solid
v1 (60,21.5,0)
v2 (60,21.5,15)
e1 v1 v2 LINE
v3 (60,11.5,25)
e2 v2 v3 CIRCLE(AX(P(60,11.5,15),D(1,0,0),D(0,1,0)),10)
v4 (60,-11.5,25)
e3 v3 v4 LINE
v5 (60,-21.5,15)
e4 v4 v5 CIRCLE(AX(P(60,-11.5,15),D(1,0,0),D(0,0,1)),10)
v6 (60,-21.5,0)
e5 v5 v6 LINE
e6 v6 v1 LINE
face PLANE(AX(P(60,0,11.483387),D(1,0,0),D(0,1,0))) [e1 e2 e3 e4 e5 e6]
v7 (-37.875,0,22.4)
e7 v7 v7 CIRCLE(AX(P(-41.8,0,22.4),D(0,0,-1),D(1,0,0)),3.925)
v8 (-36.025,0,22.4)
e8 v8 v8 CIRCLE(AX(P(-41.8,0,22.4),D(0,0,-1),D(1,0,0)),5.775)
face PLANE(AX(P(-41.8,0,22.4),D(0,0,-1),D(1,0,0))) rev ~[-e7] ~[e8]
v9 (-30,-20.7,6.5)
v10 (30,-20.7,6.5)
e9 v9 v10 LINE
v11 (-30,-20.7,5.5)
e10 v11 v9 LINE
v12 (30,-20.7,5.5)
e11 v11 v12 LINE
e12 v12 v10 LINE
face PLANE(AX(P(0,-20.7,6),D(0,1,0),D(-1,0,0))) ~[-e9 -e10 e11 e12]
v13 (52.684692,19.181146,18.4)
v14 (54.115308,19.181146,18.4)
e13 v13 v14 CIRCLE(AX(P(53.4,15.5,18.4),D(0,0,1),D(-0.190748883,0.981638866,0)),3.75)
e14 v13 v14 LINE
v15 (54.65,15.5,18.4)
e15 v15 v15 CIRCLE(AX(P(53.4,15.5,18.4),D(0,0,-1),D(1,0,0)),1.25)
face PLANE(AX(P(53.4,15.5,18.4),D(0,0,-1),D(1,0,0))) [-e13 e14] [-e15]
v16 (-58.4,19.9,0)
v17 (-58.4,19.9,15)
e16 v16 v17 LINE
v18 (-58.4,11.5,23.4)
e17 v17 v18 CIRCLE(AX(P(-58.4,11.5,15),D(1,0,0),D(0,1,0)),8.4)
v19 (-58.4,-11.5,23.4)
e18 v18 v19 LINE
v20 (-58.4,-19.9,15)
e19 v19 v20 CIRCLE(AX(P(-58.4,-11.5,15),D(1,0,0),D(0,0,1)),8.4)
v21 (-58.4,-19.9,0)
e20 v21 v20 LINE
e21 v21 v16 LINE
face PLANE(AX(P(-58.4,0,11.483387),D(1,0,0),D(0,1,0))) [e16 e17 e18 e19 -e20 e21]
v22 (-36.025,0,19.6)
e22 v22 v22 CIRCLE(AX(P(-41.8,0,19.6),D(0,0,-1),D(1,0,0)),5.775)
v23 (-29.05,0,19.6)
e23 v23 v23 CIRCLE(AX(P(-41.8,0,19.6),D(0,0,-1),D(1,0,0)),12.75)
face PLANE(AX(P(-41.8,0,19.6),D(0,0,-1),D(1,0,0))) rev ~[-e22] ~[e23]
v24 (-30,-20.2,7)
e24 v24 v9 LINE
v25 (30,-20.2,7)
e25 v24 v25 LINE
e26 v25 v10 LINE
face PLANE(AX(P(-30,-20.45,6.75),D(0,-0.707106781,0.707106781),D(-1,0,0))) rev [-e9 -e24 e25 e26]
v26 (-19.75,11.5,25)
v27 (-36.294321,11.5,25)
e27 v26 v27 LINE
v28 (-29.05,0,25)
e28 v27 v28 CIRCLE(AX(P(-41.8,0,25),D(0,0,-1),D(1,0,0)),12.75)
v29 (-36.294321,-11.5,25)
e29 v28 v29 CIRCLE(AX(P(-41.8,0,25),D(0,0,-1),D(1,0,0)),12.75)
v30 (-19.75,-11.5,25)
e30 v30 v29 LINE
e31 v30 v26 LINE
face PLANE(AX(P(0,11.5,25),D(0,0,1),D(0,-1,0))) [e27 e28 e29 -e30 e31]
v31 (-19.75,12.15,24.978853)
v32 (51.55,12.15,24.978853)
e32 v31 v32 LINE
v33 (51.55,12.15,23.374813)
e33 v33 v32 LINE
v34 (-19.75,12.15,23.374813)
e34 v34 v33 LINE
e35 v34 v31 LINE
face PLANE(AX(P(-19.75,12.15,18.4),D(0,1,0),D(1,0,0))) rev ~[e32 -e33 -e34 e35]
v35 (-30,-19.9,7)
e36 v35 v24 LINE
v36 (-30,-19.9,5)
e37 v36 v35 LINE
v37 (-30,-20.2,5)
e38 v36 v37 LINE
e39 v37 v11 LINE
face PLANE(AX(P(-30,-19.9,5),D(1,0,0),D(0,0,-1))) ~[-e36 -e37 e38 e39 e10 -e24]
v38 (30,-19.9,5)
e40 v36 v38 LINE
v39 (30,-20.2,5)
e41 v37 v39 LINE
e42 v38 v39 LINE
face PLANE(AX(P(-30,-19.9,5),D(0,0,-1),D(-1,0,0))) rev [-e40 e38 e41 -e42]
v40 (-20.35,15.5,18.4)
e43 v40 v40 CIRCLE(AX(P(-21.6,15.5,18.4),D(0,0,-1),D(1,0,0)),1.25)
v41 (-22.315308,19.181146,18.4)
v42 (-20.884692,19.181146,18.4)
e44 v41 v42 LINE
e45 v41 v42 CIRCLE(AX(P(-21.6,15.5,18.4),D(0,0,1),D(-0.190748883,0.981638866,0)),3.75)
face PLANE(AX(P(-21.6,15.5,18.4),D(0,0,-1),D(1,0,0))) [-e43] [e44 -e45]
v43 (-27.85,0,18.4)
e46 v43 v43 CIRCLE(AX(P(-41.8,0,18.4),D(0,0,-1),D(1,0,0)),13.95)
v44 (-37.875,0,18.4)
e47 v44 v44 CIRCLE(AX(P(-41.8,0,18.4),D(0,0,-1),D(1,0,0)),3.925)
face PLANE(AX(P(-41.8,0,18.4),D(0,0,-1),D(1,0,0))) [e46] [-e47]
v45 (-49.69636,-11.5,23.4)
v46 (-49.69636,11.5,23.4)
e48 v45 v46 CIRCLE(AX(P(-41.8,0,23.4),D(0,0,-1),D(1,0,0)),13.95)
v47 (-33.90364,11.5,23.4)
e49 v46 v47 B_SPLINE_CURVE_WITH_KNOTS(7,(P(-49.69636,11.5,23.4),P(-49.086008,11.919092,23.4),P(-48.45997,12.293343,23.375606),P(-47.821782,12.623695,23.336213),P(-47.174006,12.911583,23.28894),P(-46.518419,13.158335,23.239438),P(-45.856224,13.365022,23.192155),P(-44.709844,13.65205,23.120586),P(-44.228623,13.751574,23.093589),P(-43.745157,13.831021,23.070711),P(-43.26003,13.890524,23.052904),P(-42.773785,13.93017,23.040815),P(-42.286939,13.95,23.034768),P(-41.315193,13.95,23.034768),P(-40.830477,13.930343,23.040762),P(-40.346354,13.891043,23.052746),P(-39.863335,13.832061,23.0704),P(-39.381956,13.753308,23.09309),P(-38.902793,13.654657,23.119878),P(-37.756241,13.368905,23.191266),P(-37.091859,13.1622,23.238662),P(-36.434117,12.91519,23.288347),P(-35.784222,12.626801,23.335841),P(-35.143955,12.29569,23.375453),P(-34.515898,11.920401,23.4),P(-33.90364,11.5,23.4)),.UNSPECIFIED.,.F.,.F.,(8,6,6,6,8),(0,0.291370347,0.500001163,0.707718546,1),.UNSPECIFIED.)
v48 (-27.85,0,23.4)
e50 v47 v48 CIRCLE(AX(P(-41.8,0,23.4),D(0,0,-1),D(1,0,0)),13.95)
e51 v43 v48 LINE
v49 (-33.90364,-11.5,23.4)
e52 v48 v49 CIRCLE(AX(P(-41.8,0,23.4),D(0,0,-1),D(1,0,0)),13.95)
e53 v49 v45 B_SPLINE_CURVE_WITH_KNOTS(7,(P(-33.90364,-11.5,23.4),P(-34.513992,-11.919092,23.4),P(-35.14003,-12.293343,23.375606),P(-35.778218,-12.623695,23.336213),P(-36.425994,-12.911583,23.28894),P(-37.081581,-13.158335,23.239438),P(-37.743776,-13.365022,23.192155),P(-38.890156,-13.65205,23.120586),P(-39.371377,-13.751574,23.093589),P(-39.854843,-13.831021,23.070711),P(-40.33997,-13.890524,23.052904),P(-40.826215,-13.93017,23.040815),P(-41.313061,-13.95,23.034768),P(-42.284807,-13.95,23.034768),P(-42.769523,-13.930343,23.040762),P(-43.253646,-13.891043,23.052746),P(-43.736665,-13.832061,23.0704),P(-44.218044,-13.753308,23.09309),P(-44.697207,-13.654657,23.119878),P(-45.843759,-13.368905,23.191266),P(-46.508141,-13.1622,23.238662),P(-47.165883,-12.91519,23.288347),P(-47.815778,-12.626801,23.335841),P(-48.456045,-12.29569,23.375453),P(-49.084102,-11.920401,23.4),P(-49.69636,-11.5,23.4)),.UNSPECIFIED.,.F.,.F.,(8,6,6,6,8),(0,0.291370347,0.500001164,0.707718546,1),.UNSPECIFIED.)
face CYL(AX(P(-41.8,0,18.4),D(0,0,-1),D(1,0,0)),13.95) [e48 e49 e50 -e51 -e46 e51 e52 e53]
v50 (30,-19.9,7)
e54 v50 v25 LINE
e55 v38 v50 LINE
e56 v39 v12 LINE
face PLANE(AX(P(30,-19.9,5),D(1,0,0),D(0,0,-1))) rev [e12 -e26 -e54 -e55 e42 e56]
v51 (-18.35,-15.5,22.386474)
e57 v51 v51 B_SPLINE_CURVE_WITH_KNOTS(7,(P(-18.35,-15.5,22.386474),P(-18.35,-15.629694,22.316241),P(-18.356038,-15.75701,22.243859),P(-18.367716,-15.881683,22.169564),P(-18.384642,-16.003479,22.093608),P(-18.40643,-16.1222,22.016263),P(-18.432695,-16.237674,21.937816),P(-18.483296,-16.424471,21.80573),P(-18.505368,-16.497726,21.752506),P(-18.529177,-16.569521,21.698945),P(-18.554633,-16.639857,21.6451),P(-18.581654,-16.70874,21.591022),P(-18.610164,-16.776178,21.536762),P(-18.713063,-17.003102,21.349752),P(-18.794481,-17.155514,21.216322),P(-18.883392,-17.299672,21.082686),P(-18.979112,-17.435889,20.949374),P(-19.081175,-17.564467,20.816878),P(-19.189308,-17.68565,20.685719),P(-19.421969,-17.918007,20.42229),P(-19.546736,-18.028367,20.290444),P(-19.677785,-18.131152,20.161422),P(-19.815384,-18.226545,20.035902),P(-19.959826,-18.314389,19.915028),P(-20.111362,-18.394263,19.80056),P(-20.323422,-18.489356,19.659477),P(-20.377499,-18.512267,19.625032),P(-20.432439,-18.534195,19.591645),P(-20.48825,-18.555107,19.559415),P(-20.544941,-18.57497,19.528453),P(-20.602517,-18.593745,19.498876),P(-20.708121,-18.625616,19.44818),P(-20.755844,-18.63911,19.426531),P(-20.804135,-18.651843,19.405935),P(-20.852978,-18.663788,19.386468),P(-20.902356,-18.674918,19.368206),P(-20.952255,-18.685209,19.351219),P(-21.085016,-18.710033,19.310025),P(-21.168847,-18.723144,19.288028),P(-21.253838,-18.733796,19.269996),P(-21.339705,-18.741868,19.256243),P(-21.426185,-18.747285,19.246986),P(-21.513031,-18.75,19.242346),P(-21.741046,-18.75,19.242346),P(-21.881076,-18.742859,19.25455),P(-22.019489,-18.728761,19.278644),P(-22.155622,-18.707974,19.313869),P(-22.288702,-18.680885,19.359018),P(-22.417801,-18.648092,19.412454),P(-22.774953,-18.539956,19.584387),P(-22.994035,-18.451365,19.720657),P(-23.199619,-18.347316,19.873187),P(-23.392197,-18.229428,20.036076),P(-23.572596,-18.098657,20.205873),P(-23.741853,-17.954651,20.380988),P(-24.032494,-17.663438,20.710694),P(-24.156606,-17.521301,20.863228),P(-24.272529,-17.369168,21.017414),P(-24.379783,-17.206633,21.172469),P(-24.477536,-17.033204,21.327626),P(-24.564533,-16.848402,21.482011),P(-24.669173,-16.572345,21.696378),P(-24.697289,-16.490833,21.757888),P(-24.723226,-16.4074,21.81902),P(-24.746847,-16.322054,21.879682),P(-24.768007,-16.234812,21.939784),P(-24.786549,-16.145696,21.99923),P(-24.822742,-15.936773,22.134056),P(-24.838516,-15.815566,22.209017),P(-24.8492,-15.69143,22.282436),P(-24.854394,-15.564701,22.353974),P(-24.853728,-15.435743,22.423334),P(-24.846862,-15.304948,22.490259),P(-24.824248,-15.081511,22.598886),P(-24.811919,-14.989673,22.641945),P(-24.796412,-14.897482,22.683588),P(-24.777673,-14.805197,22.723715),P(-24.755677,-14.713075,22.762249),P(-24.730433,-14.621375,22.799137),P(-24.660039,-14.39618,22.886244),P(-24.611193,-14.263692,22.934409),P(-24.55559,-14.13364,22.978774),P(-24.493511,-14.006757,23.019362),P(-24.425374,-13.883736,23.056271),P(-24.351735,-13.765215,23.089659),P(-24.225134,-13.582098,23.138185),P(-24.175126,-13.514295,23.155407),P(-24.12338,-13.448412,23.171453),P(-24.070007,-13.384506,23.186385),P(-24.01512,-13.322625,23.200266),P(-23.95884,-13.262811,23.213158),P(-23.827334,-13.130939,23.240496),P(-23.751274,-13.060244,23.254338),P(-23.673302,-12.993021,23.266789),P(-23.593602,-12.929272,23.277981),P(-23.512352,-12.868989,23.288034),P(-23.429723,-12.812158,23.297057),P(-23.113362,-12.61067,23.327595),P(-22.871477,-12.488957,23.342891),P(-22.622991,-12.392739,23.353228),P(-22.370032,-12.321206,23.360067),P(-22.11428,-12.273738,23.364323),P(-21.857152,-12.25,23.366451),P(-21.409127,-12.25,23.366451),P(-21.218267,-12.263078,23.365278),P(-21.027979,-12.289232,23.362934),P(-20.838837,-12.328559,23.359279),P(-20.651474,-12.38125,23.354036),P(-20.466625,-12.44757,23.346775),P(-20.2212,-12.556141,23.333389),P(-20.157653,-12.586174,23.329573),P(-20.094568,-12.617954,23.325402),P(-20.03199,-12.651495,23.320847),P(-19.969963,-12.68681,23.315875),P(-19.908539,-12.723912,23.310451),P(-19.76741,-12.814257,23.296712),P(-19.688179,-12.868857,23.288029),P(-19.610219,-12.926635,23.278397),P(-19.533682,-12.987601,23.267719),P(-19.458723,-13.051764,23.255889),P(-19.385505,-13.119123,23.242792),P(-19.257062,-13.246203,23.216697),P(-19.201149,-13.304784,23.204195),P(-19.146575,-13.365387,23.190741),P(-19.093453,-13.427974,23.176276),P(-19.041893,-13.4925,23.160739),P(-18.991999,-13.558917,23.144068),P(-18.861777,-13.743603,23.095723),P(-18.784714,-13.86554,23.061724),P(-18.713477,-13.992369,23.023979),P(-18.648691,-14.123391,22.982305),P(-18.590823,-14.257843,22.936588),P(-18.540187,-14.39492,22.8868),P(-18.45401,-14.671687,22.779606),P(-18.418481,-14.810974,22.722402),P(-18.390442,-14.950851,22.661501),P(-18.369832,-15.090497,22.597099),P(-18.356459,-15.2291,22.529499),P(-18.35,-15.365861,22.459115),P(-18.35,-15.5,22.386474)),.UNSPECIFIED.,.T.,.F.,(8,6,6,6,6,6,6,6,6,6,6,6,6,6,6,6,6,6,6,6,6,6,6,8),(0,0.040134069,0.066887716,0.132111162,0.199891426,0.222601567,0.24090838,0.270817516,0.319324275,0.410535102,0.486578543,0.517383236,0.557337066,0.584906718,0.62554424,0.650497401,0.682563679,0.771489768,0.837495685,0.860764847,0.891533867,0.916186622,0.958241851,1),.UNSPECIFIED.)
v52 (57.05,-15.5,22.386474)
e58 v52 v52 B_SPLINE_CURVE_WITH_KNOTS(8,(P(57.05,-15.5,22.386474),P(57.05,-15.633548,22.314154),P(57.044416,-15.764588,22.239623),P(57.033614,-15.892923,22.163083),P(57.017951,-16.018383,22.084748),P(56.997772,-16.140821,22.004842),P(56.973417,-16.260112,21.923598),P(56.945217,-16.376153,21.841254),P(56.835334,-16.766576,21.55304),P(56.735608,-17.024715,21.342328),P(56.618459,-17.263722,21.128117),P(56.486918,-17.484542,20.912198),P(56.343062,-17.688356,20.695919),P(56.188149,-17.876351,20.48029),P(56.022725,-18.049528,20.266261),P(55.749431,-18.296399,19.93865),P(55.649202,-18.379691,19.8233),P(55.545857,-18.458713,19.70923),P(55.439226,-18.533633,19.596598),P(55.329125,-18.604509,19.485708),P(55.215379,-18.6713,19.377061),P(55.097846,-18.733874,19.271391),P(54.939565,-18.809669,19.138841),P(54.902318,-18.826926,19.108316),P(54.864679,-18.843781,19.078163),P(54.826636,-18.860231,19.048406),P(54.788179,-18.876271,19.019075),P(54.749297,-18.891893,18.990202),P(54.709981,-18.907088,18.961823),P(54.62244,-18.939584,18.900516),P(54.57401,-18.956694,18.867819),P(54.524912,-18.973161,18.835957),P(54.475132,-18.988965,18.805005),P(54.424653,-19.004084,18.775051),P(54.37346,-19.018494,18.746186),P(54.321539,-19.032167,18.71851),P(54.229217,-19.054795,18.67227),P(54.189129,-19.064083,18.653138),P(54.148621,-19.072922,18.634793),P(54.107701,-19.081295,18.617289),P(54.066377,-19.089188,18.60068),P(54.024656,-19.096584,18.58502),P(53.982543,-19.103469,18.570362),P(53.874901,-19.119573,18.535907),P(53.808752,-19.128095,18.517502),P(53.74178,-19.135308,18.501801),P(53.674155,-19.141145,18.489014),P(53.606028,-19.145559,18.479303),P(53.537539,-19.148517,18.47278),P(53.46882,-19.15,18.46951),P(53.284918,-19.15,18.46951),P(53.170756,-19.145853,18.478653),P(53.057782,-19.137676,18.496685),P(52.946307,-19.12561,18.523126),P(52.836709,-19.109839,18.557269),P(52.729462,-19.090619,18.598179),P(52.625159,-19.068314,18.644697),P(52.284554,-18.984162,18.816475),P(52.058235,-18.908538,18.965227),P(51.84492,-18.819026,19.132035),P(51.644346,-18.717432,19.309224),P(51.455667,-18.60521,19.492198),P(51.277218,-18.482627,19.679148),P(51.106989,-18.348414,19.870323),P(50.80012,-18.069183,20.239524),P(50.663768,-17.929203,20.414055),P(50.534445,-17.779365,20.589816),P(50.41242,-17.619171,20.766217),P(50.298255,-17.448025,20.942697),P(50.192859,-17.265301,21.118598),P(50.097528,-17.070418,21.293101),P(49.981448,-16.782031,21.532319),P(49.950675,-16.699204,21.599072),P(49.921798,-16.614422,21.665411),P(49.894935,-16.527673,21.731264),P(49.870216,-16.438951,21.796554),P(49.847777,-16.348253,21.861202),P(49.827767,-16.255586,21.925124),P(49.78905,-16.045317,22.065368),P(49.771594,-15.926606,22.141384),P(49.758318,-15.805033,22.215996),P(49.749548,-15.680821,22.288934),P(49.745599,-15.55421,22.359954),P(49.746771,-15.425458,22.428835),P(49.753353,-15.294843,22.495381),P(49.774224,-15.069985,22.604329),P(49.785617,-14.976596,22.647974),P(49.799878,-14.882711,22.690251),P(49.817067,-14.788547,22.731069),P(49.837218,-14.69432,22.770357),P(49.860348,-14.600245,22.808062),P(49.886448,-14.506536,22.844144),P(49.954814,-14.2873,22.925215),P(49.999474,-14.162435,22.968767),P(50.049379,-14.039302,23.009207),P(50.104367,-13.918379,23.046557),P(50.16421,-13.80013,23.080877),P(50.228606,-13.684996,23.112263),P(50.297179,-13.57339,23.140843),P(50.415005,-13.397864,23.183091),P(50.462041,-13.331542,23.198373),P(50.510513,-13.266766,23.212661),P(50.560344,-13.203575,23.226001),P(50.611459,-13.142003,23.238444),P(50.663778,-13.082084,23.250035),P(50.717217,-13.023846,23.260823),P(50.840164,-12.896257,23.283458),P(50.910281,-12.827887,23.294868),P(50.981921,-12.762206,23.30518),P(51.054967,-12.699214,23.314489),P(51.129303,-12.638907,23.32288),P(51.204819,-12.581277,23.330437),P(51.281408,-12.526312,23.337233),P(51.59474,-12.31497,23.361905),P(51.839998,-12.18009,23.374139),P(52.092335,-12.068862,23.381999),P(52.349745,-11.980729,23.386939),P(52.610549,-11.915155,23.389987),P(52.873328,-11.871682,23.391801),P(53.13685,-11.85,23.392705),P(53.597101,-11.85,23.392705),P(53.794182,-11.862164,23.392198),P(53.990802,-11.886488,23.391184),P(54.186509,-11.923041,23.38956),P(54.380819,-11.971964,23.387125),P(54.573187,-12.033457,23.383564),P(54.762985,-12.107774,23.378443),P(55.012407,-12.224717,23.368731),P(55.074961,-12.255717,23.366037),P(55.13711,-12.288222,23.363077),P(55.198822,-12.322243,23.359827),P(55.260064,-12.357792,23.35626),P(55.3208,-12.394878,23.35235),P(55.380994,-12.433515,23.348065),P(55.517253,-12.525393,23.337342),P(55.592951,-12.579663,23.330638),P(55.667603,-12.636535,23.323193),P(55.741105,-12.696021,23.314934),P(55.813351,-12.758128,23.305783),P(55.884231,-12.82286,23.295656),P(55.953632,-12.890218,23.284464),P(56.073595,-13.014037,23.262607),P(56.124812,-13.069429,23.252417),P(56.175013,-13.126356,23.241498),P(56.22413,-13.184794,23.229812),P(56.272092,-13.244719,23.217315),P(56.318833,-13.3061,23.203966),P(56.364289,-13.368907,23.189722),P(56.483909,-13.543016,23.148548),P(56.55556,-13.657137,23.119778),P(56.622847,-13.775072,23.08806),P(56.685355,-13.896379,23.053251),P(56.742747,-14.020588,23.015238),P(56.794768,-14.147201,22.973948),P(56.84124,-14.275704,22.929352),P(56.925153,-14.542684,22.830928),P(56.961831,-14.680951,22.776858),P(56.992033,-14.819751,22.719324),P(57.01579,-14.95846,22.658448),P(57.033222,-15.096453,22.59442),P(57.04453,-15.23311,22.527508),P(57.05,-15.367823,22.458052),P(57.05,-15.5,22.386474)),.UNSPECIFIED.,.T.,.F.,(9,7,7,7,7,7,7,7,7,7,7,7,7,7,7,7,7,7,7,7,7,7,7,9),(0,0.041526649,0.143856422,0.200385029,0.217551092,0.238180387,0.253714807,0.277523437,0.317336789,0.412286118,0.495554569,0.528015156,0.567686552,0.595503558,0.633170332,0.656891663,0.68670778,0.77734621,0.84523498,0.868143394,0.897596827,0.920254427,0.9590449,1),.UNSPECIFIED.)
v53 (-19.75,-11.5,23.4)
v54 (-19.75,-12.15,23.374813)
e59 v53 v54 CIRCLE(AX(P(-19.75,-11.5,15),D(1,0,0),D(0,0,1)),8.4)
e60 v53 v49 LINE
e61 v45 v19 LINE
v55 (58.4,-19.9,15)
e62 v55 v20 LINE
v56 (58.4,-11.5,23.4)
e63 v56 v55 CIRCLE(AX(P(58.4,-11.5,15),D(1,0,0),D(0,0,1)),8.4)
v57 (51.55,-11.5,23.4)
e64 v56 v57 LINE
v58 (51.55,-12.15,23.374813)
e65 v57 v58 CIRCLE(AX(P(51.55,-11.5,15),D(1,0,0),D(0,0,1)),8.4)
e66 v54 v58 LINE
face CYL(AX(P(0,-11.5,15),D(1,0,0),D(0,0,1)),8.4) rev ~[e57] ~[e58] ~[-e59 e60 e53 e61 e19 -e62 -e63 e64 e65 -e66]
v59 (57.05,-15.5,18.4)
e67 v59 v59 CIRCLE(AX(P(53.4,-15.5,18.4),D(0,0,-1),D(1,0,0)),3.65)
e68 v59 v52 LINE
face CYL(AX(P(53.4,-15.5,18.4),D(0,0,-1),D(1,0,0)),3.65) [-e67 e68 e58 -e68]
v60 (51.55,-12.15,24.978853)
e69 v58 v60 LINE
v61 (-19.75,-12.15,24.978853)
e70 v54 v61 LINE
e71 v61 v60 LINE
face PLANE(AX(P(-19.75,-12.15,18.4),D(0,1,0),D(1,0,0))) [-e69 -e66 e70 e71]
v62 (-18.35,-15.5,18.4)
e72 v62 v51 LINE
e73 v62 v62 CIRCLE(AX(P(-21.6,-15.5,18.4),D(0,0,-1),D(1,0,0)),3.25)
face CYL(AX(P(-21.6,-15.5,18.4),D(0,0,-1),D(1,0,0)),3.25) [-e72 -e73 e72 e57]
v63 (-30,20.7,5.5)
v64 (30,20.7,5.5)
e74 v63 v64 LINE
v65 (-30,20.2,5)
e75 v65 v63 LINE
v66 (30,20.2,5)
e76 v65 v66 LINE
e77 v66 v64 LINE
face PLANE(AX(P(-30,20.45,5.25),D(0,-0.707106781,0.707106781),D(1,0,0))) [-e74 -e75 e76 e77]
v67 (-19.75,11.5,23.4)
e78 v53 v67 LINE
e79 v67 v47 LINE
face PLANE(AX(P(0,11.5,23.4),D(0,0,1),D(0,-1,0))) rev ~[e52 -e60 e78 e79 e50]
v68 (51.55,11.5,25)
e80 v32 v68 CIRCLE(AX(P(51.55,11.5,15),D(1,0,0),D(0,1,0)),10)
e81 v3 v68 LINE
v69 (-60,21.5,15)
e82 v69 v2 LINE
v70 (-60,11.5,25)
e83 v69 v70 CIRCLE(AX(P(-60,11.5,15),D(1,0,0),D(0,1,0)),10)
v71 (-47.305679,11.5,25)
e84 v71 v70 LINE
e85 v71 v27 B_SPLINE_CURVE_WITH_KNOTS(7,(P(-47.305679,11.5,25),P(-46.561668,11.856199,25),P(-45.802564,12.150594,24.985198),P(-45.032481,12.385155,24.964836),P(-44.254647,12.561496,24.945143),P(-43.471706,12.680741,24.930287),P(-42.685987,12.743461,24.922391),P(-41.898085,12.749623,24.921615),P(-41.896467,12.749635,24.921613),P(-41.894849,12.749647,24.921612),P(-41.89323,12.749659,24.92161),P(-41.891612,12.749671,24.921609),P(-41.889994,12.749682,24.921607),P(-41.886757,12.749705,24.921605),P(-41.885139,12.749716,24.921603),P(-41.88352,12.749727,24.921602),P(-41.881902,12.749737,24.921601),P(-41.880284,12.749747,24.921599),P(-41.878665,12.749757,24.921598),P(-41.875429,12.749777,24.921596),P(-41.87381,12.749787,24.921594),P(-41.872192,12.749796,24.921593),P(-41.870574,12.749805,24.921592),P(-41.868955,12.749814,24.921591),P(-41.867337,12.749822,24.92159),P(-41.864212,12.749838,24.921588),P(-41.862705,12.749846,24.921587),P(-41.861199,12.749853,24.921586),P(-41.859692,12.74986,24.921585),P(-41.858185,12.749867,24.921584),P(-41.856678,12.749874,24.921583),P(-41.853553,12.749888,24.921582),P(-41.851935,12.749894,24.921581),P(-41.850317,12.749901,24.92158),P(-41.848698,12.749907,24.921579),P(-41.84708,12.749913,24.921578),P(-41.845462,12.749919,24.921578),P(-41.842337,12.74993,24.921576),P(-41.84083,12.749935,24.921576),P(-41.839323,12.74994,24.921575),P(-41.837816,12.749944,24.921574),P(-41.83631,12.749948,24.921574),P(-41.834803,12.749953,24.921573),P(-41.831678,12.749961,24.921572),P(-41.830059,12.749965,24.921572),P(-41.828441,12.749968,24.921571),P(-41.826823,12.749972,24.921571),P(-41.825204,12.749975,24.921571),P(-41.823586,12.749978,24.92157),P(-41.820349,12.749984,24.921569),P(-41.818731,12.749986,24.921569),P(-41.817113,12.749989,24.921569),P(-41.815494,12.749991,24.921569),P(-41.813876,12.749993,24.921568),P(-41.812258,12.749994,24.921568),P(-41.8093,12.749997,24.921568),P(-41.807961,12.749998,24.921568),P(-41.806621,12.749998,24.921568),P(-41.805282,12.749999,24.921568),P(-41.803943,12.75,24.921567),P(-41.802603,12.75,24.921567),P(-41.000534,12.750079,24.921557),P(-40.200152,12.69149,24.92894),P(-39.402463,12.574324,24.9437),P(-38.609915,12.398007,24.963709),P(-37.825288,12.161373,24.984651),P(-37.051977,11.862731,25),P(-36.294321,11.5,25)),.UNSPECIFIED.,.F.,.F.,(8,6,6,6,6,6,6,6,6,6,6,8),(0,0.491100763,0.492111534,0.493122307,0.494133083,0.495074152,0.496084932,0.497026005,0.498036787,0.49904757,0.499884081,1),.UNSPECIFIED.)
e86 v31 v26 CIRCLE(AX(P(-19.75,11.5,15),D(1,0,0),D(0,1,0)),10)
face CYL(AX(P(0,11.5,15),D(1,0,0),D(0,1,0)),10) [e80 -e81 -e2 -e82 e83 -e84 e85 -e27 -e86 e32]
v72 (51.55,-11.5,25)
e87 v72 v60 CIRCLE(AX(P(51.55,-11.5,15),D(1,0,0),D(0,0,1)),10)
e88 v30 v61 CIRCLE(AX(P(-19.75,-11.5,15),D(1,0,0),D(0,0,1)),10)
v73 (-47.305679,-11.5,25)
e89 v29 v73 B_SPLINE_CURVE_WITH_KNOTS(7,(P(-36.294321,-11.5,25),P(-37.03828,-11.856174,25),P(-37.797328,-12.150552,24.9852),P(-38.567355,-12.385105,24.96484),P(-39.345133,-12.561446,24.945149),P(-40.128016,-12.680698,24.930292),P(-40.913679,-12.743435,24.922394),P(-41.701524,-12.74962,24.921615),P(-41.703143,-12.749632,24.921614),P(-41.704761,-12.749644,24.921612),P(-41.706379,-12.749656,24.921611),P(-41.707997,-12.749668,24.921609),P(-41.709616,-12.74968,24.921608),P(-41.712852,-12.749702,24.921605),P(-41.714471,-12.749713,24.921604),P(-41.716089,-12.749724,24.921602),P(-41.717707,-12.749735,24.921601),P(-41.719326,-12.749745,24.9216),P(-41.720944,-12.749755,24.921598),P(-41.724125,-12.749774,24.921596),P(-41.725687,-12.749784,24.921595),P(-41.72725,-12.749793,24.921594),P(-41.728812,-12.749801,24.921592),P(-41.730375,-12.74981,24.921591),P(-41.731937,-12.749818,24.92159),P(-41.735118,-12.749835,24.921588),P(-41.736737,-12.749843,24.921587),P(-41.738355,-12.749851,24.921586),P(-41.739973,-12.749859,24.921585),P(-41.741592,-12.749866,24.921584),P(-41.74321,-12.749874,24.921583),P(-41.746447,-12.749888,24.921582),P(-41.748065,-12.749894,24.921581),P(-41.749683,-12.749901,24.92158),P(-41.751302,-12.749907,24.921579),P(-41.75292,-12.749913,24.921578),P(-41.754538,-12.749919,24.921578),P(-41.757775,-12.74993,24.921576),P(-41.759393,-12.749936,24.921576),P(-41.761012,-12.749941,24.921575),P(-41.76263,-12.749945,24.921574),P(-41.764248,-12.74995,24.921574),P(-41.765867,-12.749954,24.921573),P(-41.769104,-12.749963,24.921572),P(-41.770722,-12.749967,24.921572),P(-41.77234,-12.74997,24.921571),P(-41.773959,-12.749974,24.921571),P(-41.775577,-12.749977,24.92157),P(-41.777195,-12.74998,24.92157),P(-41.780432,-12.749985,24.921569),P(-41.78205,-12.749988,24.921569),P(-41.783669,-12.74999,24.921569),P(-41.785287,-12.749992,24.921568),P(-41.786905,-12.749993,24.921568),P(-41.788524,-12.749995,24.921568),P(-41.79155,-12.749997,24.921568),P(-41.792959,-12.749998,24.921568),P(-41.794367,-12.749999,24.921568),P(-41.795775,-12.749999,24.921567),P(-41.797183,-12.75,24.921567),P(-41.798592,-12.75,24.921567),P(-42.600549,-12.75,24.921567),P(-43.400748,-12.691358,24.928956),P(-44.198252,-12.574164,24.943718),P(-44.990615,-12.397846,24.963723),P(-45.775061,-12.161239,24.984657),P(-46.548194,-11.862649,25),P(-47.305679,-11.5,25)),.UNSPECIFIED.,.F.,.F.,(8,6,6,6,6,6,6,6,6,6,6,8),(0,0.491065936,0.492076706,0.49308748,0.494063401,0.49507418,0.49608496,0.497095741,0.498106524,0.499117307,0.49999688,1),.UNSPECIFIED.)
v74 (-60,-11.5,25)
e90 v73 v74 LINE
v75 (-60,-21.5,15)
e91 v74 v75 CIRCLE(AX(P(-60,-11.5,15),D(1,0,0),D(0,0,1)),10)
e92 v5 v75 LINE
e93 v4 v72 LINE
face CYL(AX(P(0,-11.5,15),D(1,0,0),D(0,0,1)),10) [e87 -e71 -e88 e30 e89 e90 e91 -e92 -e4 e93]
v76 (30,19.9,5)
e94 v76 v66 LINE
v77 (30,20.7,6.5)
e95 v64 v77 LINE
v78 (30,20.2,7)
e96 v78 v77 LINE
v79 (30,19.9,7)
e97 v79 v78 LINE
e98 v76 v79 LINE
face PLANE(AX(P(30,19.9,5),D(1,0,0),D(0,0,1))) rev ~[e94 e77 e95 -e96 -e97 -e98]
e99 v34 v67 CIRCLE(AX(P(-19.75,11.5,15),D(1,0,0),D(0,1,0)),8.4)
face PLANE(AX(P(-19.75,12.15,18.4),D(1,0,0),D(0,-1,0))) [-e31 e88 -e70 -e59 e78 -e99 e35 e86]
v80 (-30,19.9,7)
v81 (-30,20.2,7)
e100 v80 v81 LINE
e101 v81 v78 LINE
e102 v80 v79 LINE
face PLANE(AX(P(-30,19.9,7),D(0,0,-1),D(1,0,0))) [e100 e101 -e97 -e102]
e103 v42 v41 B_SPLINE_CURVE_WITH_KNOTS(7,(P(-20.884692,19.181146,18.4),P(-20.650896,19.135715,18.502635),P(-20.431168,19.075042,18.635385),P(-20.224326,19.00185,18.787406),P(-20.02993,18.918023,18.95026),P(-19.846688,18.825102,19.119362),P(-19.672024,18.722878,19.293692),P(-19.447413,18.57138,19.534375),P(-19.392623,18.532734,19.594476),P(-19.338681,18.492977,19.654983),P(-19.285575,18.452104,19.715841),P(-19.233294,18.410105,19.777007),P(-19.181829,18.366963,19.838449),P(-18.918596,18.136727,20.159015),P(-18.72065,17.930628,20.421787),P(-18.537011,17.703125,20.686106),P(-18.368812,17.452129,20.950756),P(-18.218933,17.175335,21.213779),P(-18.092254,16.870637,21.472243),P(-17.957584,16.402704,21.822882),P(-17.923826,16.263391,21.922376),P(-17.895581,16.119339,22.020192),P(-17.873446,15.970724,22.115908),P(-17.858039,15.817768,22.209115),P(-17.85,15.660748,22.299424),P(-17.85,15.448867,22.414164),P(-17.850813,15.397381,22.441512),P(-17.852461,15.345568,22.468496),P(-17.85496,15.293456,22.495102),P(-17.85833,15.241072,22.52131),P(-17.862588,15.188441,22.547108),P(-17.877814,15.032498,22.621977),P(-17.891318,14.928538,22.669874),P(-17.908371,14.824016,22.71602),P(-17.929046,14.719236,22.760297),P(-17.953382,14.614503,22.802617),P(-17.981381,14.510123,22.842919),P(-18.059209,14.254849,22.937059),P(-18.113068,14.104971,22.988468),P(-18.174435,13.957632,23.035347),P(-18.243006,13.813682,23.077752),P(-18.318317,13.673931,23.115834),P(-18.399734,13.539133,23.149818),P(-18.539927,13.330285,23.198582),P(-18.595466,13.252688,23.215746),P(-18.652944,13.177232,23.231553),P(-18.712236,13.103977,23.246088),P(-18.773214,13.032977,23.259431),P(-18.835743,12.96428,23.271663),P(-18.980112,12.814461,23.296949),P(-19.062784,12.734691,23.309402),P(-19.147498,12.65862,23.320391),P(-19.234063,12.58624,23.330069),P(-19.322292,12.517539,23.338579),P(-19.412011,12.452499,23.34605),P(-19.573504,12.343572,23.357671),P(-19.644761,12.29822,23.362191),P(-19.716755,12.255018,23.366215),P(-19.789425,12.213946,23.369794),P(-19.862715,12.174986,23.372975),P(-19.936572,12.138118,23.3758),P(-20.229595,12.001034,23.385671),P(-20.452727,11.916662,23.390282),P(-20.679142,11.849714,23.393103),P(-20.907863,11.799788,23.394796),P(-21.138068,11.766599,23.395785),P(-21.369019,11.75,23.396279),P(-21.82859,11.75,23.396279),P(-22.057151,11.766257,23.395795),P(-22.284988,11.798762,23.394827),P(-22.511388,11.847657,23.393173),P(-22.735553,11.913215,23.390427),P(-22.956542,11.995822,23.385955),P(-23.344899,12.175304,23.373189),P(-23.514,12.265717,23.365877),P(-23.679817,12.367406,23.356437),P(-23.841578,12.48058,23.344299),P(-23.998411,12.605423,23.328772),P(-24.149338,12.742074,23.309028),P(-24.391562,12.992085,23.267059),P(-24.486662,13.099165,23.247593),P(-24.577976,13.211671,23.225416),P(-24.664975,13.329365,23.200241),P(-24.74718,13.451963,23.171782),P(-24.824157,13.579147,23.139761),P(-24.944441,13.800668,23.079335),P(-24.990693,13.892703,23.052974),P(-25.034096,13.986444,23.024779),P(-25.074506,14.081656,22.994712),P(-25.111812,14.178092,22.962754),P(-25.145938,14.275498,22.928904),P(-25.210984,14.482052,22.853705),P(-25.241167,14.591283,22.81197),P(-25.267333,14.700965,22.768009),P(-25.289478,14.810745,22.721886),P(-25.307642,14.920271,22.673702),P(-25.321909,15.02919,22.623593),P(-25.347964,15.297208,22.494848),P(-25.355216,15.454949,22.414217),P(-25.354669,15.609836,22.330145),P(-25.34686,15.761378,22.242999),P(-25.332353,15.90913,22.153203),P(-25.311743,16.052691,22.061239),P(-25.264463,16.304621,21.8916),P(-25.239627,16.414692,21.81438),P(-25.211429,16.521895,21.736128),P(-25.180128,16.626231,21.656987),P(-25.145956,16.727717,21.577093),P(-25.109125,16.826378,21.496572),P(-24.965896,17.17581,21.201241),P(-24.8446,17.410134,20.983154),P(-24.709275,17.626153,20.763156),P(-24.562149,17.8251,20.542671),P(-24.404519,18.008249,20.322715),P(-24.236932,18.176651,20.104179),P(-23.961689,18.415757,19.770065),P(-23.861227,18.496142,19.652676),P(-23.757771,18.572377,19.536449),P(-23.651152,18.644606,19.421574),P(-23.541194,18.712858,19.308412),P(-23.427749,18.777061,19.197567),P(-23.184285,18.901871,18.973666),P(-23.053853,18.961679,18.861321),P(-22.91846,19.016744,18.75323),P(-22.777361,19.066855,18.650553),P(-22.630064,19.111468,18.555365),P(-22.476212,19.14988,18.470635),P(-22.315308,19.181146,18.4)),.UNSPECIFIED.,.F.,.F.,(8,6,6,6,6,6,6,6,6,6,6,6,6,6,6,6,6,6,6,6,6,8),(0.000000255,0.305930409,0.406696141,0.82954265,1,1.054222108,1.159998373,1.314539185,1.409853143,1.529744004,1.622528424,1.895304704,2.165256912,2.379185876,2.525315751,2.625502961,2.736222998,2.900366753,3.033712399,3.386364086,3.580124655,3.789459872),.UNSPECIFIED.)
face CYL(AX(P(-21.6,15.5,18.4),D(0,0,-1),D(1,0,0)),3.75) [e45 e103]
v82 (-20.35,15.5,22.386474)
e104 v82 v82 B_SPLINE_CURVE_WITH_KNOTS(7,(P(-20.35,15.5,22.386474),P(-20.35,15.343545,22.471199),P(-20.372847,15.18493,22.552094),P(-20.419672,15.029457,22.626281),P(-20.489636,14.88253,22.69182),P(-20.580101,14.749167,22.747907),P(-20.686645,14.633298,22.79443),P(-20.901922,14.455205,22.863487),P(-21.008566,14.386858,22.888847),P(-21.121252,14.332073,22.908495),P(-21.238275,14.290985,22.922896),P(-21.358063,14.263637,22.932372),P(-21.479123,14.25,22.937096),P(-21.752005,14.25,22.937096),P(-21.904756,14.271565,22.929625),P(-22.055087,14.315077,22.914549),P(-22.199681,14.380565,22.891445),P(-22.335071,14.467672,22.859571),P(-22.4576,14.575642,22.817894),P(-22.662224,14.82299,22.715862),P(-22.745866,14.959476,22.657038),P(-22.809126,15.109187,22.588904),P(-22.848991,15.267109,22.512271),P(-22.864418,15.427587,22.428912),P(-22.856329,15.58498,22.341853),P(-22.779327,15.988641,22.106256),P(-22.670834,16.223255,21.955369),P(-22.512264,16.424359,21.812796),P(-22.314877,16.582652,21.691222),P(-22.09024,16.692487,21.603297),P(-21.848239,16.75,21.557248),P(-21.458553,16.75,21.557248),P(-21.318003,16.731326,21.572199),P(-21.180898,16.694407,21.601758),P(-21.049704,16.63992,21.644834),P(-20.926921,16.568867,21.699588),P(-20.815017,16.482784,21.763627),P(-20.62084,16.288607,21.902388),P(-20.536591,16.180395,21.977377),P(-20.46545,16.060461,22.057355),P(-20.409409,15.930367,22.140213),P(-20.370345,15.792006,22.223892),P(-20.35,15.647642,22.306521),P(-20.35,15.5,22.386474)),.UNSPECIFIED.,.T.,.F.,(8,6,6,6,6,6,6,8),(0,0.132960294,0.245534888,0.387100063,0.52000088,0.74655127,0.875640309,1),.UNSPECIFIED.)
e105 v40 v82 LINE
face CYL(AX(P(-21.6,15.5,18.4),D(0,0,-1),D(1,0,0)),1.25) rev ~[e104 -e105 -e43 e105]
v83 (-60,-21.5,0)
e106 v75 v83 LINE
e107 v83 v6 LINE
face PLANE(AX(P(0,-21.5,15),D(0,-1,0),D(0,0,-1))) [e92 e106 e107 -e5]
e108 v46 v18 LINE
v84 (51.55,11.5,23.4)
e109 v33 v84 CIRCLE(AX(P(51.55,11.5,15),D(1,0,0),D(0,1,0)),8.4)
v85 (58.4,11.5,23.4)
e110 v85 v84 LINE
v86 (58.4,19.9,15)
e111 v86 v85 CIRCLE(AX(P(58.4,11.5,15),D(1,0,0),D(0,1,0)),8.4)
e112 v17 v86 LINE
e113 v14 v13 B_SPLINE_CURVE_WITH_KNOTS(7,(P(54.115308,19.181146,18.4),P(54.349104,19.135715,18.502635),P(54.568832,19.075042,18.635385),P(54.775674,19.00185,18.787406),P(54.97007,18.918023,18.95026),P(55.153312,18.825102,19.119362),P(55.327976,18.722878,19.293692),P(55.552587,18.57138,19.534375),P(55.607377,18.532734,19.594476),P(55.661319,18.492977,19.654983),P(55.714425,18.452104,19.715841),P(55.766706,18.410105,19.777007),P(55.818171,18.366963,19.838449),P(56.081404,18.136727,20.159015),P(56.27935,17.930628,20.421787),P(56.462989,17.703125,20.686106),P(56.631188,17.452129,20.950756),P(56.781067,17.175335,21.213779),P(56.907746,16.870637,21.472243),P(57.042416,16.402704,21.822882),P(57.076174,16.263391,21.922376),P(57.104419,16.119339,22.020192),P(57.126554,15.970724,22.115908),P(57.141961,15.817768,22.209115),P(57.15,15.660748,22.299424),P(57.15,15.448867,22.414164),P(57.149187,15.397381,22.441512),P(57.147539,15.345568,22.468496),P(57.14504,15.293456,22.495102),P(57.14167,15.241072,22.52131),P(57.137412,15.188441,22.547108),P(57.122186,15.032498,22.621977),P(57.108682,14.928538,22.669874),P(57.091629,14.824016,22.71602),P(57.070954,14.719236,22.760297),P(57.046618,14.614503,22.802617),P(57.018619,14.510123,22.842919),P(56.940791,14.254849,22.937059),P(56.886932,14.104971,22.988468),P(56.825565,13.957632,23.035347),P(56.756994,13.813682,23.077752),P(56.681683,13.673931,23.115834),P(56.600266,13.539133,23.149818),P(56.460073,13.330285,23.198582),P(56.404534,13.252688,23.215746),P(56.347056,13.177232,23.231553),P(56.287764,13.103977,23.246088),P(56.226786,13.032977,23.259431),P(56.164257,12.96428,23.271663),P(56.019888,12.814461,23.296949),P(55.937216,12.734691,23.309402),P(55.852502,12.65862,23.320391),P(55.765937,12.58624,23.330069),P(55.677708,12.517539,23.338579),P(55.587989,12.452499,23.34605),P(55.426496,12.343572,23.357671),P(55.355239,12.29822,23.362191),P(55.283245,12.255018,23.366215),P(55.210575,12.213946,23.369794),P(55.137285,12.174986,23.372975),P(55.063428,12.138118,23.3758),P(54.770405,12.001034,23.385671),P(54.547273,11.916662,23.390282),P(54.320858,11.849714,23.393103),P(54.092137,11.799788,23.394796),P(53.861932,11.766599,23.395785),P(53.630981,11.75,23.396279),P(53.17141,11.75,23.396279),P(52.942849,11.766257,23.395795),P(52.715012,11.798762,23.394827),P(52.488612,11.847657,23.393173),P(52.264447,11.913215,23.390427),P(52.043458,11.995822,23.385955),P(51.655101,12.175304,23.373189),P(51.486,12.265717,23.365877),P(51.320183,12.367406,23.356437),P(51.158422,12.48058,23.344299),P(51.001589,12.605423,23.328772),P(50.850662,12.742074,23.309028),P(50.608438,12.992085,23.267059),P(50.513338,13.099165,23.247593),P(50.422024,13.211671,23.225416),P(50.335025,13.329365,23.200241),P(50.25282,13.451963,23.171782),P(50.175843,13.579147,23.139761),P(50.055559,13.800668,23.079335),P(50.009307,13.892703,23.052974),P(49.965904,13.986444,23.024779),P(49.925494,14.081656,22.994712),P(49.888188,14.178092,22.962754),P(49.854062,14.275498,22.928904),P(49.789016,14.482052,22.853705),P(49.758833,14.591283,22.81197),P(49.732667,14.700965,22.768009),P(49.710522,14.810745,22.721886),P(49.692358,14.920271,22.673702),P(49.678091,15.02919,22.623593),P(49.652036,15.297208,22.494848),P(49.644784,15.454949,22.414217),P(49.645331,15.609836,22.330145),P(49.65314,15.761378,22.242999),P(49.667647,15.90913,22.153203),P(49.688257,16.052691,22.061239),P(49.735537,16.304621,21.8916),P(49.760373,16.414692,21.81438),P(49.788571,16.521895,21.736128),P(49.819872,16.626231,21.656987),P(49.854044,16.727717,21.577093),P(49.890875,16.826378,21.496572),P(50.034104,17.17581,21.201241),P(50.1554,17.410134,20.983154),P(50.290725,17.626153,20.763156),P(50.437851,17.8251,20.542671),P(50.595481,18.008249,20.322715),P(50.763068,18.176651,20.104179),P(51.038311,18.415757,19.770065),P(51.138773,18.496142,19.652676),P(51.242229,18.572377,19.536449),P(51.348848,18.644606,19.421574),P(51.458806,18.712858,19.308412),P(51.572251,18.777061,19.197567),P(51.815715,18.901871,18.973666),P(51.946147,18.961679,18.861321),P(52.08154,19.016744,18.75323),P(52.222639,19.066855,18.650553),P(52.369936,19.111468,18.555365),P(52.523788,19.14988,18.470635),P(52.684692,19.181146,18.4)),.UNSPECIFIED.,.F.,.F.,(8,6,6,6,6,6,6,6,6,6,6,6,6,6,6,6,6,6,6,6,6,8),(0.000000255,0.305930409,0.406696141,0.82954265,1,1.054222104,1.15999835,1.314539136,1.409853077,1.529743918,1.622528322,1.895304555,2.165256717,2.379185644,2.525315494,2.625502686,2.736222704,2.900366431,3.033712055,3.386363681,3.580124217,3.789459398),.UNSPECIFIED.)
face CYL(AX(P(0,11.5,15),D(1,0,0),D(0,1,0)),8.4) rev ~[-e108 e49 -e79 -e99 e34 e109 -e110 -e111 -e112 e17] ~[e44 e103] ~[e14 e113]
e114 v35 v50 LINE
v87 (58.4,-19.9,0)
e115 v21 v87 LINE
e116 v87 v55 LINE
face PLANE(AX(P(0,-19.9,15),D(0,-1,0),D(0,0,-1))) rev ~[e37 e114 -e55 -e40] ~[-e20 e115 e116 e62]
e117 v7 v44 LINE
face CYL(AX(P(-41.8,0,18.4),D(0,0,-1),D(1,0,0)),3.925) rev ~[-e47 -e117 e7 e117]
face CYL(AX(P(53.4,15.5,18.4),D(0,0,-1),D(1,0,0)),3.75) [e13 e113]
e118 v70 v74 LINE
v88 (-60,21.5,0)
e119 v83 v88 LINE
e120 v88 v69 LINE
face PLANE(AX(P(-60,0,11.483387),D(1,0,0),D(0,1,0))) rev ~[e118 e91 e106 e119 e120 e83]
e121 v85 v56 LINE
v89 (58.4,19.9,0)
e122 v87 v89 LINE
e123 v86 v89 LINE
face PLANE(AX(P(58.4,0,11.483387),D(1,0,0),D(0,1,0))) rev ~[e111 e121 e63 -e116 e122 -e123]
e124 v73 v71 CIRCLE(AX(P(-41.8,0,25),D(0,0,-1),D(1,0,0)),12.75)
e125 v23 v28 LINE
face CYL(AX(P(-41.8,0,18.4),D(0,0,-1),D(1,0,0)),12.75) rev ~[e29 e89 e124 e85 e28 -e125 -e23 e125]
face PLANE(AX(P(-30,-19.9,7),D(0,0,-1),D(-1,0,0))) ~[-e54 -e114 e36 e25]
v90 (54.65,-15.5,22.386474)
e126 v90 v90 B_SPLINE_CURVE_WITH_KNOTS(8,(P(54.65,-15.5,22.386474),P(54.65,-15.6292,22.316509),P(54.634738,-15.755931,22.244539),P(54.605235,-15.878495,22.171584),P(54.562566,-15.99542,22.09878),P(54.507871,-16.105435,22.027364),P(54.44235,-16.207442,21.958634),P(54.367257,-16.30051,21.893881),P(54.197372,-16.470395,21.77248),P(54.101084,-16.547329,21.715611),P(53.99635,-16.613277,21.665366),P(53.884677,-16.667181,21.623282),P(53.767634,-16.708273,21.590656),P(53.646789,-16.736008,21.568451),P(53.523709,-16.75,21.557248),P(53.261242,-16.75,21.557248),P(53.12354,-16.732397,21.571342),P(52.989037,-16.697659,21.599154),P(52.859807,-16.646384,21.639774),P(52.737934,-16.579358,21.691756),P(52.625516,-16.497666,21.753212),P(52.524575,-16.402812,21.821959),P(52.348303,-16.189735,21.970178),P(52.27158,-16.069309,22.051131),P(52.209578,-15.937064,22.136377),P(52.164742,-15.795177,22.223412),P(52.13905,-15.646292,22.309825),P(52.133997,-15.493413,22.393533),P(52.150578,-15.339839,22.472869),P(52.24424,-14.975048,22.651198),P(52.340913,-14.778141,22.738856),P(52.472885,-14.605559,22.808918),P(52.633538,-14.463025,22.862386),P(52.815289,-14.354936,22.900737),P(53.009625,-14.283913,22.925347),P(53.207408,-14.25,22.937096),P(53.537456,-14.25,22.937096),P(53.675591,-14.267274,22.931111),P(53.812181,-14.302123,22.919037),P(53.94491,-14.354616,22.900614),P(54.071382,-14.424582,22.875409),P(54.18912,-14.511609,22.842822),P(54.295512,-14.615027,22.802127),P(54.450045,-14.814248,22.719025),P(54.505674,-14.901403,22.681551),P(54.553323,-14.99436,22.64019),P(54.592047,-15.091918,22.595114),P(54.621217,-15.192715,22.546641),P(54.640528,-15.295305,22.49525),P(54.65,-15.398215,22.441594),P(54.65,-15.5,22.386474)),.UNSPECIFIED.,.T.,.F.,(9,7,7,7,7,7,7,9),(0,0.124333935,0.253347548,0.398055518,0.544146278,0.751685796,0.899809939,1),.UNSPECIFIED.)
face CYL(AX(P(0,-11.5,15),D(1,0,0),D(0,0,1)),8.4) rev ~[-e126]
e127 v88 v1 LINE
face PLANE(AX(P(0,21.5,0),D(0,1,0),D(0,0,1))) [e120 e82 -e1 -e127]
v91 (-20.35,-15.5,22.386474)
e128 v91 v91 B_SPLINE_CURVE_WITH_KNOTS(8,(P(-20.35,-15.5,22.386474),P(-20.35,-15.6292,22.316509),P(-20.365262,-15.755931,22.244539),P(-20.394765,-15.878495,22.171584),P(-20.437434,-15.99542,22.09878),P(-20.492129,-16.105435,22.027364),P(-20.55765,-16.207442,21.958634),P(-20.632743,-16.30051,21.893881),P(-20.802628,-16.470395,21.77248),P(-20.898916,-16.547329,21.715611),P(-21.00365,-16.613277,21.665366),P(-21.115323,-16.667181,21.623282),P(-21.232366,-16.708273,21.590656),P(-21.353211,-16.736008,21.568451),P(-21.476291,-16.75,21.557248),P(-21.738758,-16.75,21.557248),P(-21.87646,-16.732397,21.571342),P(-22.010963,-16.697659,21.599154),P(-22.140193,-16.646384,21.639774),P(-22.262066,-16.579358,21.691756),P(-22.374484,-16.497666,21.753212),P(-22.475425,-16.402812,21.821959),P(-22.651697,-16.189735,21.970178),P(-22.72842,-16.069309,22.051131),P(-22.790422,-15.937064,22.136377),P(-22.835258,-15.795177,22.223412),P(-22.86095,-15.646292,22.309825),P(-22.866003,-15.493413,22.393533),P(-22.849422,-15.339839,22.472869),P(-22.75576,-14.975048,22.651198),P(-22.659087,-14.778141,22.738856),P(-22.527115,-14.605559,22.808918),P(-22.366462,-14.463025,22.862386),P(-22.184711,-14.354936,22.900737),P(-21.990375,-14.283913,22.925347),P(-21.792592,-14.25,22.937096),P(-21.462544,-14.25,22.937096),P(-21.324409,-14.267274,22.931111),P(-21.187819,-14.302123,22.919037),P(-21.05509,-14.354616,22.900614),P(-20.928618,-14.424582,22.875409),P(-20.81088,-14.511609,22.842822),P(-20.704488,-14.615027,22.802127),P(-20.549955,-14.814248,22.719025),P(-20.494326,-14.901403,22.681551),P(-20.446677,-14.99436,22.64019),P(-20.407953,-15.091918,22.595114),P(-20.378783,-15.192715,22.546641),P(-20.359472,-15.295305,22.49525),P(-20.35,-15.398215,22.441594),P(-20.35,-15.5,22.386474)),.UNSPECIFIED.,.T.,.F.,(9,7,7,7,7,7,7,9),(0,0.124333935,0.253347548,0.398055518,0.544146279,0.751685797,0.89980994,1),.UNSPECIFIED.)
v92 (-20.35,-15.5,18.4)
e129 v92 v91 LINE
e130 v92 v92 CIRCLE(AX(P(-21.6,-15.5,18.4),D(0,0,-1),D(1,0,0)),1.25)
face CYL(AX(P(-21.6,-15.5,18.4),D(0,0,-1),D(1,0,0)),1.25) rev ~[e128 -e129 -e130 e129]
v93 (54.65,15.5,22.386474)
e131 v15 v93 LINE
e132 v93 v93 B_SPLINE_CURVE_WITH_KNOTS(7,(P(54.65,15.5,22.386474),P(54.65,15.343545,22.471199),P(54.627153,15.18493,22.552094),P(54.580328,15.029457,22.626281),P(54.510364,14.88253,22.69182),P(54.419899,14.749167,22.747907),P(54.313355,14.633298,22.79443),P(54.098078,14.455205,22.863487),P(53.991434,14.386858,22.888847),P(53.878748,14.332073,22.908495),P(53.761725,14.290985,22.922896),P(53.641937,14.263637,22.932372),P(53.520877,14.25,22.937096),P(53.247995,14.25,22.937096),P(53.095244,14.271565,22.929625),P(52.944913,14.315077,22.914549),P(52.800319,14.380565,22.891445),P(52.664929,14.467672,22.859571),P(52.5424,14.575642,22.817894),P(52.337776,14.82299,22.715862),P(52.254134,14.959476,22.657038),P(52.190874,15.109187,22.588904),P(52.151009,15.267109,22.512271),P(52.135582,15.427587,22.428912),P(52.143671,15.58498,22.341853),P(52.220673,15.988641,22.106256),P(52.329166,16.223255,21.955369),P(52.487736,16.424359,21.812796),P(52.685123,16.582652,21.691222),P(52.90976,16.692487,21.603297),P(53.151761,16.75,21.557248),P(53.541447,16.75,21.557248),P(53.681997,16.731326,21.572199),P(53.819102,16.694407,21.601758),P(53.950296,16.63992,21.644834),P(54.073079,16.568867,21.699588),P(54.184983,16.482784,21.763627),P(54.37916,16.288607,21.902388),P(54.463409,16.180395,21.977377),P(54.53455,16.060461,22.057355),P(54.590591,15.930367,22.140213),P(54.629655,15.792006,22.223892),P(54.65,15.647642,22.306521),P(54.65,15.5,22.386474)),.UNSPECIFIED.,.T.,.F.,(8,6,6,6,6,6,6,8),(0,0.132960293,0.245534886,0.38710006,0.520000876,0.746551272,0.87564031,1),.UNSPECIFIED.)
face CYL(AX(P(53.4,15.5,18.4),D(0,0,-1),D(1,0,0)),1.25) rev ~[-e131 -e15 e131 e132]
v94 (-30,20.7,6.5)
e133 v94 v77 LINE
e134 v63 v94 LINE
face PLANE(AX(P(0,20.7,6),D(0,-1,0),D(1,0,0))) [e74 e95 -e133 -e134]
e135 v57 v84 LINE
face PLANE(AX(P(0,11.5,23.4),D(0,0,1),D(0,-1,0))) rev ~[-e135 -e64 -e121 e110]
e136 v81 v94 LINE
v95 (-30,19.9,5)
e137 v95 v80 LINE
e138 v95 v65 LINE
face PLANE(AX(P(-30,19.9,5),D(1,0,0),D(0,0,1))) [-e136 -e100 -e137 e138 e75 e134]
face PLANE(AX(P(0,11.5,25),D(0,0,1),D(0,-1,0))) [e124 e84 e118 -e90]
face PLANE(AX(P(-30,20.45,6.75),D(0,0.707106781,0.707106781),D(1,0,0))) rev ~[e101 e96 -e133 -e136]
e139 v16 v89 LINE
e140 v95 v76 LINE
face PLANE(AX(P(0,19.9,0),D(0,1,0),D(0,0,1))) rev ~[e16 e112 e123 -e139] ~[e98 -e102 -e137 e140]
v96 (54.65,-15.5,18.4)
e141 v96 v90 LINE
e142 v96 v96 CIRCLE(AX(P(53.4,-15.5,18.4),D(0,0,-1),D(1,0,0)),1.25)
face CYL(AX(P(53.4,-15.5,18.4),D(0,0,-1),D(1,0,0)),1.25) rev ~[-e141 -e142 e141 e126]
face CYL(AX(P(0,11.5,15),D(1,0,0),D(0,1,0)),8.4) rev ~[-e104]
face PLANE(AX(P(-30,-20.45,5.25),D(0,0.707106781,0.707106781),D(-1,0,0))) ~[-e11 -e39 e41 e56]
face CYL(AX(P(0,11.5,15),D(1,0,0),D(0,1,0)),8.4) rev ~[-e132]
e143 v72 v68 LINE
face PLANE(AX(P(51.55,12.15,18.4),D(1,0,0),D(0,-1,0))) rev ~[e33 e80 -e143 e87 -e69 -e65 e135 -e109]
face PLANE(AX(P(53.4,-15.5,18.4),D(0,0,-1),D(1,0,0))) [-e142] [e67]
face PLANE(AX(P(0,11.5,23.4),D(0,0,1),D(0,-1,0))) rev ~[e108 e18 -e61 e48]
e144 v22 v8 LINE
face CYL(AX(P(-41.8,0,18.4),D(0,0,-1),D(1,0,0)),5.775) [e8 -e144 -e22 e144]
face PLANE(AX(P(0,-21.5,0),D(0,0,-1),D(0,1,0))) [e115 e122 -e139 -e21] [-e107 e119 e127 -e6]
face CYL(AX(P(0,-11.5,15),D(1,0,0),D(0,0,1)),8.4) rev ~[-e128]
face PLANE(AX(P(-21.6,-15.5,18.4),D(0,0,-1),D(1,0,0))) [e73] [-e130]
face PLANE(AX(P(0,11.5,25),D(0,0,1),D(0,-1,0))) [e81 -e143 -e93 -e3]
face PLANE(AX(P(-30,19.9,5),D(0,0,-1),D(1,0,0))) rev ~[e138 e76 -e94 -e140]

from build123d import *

# Parameters (mm, degrees)
F1_DEPTH  = 60
F2_T      = -1.6
F4_R      = 3.75
F4_R_2    = 1.25
F4_R_3    = 3.65
F4_R_4    = 3.25
F4_R_5    = 12.75
F4_W      = 71.3
F4_H      = 24.3
F6_DEPTH  = 6.601
F4_R_6    = 13.95
F7_DEPTH  = 1.2
F8_R      = 3.925
F9_DEPTH  = 6.6010001
F8_R_2    = 5.775
F10_DEPTH = 4
F11_DEPTH = 5
F12_W     = 60
F12_H     = 2
F13_DEPTH = 0.8
F14_SIZE  = 0.5


with BuildPart() as f1:
    # F0 (on Right) → F1 (new body, symmetric)
    with BuildSketch(Plane.YZ):
        with BuildLine():
            Line((-21.5, 15), (-21.5, 0))
            Line((-21.5, 0), (21.5, 0))
            Line((21.5, 0), (21.5, 15))
            ThreePointArc((21.5, 15), (18.5710678119, 22.0710678119), (11.5, 25))
            Line((11.5, 25), (-11.5, 25))
            ThreePointArc((-11.5, 25), (-18.5710678119, 22.0710678119), (-21.5, 15))
        make_face()
    extrude(amount=F1_DEPTH, both=True)

    # F2
    f2_openings = [f1.faces().sort_by_distance(p)[0] for p in [
        (0, 0, 0),
    ]]
    offset(amount=F2_T, openings=f2_openings)

    # F4 (on offset) → F5 (join, up to the next surface of F1)
    with BuildSketch(Plane(origin=(0, 0, 18.4), x_dir=(1, 0, 0), z_dir=(0, 0, -1))):
        with Locations((53.4, -15.5)):
            Circle(F4_R)
        with Locations((53.4, -15.5)):
            Circle(F4_R_2, mode=Mode.SUBTRACT)
        with Locations((53.4, 15.5)):
            Circle(F4_R_3)
        with Locations((53.4, 15.5)):
            Circle(F4_R_2, mode=Mode.SUBTRACT)
        with Locations((-21.6, -15.5)):
            Circle(F4_R)
        with Locations((-21.6, -15.5)):
            Circle(F4_R_2, mode=Mode.SUBTRACT)
        with Locations((-21.6, 15.5)):
            Circle(F4_R_4)
        with Locations((-21.6, 15.5)):
            Circle(F4_R_2, mode=Mode.SUBTRACT)
    extrude(until=Until.NEXT, dir=(0, 0, 1))

    # F4 (on offset) → F6 (cut, through all)
    with BuildSketch(Plane(origin=(0, 0, 18.4), x_dir=(1, 0, 0), z_dir=(0, 0, -1))):
        with Locations((-41.8, 0)):
            Circle(F4_R_5)
        with Locations((15.9, 0)):
            Rectangle(F4_W, F4_H)
    extrude(amount=-F6_DEPTH, mode=Mode.SUBTRACT)



with BuildPart() as f7:
    # F4 (on offset) → F7 (new body)
    with BuildSketch(Plane(origin=(0, 0, 18.4), x_dir=(1, 0, 0), z_dir=(0, 0, -1))):
        with Locations((-41.8, 0)):
            Circle(F4_R_6)
        with Locations((-41.8, 0)):
            Circle(F4_R_5, mode=Mode.SUBTRACT)
        with Locations((-41.8, 0)):
            Circle(F4_R_5)
    extrude(amount=-F7_DEPTH)

    # F8 (on face) → F9 (cut, through all)
    with BuildSketch(Plane(origin=(0, 0, 18.4), x_dir=(1, 0, 0), z_dir=(0, 0, -1))):
        with Locations((-41.8, 0)):
            Circle(F8_R)
    extrude(amount=-F9_DEPTH, mode=Mode.SUBTRACT)

    # F8 (on face) → F10 (join)
    with BuildSketch(Plane(origin=(0, 0, 18.4), x_dir=(1, 0, 0), z_dir=(0, 0, -1))):
        with Locations((-41.8, 0)):
            Circle(F8_R_2)
        with Locations((-41.8, 0)):
            Circle(F8_R, mode=Mode.SUBTRACT)
    extrude(amount=-F10_DEPTH)


with BuildPart() as f1_1:
    add(f1.part)

    add(f7.part)  # F11 merges F7
    # F4 (on offset) → F11 (join, through all)
    with BuildSketch(Plane(origin=(0, 0, 18.4), x_dir=(1, 0, 0), z_dir=(0, 0, -1))):
        with Locations((-41.8, 0)):
            Circle(F4_R_6)
        with Locations((-41.8, 0)):
            Circle(F4_R_5, mode=Mode.SUBTRACT)
    extrude(amount=-F11_DEPTH)


with BuildPart() as f13:
    # F12 (on face) → F13 (new body)
    with BuildSketch(Plane.XZ.offset(-19.9)):
        with Locations((0, 6)):
            Rectangle(F12_W, F12_H)
    extrude(amount=-F13_DEPTH)

    # F14
    f14_edges = [f13.edges().sort_by_distance(p)[0] for p in [
        (0, 20.7, 5),
        (0, 20.7, 7),
    ]]
    chamfer(f14_edges, length=F14_SIZE)


with BuildPart() as f15_1:
    # F15: instance of F13
    add(f13.part.mirror(Plane.XZ))


with BuildPart() as f1_2:
    add(f1_1.part)

    # F16: cut F13, F15_1
    add(f13.part, mode=Mode.SUBTRACT)
    add(f15_1.part, mode=Mode.SUBTRACT)


solid = f1_2.part
